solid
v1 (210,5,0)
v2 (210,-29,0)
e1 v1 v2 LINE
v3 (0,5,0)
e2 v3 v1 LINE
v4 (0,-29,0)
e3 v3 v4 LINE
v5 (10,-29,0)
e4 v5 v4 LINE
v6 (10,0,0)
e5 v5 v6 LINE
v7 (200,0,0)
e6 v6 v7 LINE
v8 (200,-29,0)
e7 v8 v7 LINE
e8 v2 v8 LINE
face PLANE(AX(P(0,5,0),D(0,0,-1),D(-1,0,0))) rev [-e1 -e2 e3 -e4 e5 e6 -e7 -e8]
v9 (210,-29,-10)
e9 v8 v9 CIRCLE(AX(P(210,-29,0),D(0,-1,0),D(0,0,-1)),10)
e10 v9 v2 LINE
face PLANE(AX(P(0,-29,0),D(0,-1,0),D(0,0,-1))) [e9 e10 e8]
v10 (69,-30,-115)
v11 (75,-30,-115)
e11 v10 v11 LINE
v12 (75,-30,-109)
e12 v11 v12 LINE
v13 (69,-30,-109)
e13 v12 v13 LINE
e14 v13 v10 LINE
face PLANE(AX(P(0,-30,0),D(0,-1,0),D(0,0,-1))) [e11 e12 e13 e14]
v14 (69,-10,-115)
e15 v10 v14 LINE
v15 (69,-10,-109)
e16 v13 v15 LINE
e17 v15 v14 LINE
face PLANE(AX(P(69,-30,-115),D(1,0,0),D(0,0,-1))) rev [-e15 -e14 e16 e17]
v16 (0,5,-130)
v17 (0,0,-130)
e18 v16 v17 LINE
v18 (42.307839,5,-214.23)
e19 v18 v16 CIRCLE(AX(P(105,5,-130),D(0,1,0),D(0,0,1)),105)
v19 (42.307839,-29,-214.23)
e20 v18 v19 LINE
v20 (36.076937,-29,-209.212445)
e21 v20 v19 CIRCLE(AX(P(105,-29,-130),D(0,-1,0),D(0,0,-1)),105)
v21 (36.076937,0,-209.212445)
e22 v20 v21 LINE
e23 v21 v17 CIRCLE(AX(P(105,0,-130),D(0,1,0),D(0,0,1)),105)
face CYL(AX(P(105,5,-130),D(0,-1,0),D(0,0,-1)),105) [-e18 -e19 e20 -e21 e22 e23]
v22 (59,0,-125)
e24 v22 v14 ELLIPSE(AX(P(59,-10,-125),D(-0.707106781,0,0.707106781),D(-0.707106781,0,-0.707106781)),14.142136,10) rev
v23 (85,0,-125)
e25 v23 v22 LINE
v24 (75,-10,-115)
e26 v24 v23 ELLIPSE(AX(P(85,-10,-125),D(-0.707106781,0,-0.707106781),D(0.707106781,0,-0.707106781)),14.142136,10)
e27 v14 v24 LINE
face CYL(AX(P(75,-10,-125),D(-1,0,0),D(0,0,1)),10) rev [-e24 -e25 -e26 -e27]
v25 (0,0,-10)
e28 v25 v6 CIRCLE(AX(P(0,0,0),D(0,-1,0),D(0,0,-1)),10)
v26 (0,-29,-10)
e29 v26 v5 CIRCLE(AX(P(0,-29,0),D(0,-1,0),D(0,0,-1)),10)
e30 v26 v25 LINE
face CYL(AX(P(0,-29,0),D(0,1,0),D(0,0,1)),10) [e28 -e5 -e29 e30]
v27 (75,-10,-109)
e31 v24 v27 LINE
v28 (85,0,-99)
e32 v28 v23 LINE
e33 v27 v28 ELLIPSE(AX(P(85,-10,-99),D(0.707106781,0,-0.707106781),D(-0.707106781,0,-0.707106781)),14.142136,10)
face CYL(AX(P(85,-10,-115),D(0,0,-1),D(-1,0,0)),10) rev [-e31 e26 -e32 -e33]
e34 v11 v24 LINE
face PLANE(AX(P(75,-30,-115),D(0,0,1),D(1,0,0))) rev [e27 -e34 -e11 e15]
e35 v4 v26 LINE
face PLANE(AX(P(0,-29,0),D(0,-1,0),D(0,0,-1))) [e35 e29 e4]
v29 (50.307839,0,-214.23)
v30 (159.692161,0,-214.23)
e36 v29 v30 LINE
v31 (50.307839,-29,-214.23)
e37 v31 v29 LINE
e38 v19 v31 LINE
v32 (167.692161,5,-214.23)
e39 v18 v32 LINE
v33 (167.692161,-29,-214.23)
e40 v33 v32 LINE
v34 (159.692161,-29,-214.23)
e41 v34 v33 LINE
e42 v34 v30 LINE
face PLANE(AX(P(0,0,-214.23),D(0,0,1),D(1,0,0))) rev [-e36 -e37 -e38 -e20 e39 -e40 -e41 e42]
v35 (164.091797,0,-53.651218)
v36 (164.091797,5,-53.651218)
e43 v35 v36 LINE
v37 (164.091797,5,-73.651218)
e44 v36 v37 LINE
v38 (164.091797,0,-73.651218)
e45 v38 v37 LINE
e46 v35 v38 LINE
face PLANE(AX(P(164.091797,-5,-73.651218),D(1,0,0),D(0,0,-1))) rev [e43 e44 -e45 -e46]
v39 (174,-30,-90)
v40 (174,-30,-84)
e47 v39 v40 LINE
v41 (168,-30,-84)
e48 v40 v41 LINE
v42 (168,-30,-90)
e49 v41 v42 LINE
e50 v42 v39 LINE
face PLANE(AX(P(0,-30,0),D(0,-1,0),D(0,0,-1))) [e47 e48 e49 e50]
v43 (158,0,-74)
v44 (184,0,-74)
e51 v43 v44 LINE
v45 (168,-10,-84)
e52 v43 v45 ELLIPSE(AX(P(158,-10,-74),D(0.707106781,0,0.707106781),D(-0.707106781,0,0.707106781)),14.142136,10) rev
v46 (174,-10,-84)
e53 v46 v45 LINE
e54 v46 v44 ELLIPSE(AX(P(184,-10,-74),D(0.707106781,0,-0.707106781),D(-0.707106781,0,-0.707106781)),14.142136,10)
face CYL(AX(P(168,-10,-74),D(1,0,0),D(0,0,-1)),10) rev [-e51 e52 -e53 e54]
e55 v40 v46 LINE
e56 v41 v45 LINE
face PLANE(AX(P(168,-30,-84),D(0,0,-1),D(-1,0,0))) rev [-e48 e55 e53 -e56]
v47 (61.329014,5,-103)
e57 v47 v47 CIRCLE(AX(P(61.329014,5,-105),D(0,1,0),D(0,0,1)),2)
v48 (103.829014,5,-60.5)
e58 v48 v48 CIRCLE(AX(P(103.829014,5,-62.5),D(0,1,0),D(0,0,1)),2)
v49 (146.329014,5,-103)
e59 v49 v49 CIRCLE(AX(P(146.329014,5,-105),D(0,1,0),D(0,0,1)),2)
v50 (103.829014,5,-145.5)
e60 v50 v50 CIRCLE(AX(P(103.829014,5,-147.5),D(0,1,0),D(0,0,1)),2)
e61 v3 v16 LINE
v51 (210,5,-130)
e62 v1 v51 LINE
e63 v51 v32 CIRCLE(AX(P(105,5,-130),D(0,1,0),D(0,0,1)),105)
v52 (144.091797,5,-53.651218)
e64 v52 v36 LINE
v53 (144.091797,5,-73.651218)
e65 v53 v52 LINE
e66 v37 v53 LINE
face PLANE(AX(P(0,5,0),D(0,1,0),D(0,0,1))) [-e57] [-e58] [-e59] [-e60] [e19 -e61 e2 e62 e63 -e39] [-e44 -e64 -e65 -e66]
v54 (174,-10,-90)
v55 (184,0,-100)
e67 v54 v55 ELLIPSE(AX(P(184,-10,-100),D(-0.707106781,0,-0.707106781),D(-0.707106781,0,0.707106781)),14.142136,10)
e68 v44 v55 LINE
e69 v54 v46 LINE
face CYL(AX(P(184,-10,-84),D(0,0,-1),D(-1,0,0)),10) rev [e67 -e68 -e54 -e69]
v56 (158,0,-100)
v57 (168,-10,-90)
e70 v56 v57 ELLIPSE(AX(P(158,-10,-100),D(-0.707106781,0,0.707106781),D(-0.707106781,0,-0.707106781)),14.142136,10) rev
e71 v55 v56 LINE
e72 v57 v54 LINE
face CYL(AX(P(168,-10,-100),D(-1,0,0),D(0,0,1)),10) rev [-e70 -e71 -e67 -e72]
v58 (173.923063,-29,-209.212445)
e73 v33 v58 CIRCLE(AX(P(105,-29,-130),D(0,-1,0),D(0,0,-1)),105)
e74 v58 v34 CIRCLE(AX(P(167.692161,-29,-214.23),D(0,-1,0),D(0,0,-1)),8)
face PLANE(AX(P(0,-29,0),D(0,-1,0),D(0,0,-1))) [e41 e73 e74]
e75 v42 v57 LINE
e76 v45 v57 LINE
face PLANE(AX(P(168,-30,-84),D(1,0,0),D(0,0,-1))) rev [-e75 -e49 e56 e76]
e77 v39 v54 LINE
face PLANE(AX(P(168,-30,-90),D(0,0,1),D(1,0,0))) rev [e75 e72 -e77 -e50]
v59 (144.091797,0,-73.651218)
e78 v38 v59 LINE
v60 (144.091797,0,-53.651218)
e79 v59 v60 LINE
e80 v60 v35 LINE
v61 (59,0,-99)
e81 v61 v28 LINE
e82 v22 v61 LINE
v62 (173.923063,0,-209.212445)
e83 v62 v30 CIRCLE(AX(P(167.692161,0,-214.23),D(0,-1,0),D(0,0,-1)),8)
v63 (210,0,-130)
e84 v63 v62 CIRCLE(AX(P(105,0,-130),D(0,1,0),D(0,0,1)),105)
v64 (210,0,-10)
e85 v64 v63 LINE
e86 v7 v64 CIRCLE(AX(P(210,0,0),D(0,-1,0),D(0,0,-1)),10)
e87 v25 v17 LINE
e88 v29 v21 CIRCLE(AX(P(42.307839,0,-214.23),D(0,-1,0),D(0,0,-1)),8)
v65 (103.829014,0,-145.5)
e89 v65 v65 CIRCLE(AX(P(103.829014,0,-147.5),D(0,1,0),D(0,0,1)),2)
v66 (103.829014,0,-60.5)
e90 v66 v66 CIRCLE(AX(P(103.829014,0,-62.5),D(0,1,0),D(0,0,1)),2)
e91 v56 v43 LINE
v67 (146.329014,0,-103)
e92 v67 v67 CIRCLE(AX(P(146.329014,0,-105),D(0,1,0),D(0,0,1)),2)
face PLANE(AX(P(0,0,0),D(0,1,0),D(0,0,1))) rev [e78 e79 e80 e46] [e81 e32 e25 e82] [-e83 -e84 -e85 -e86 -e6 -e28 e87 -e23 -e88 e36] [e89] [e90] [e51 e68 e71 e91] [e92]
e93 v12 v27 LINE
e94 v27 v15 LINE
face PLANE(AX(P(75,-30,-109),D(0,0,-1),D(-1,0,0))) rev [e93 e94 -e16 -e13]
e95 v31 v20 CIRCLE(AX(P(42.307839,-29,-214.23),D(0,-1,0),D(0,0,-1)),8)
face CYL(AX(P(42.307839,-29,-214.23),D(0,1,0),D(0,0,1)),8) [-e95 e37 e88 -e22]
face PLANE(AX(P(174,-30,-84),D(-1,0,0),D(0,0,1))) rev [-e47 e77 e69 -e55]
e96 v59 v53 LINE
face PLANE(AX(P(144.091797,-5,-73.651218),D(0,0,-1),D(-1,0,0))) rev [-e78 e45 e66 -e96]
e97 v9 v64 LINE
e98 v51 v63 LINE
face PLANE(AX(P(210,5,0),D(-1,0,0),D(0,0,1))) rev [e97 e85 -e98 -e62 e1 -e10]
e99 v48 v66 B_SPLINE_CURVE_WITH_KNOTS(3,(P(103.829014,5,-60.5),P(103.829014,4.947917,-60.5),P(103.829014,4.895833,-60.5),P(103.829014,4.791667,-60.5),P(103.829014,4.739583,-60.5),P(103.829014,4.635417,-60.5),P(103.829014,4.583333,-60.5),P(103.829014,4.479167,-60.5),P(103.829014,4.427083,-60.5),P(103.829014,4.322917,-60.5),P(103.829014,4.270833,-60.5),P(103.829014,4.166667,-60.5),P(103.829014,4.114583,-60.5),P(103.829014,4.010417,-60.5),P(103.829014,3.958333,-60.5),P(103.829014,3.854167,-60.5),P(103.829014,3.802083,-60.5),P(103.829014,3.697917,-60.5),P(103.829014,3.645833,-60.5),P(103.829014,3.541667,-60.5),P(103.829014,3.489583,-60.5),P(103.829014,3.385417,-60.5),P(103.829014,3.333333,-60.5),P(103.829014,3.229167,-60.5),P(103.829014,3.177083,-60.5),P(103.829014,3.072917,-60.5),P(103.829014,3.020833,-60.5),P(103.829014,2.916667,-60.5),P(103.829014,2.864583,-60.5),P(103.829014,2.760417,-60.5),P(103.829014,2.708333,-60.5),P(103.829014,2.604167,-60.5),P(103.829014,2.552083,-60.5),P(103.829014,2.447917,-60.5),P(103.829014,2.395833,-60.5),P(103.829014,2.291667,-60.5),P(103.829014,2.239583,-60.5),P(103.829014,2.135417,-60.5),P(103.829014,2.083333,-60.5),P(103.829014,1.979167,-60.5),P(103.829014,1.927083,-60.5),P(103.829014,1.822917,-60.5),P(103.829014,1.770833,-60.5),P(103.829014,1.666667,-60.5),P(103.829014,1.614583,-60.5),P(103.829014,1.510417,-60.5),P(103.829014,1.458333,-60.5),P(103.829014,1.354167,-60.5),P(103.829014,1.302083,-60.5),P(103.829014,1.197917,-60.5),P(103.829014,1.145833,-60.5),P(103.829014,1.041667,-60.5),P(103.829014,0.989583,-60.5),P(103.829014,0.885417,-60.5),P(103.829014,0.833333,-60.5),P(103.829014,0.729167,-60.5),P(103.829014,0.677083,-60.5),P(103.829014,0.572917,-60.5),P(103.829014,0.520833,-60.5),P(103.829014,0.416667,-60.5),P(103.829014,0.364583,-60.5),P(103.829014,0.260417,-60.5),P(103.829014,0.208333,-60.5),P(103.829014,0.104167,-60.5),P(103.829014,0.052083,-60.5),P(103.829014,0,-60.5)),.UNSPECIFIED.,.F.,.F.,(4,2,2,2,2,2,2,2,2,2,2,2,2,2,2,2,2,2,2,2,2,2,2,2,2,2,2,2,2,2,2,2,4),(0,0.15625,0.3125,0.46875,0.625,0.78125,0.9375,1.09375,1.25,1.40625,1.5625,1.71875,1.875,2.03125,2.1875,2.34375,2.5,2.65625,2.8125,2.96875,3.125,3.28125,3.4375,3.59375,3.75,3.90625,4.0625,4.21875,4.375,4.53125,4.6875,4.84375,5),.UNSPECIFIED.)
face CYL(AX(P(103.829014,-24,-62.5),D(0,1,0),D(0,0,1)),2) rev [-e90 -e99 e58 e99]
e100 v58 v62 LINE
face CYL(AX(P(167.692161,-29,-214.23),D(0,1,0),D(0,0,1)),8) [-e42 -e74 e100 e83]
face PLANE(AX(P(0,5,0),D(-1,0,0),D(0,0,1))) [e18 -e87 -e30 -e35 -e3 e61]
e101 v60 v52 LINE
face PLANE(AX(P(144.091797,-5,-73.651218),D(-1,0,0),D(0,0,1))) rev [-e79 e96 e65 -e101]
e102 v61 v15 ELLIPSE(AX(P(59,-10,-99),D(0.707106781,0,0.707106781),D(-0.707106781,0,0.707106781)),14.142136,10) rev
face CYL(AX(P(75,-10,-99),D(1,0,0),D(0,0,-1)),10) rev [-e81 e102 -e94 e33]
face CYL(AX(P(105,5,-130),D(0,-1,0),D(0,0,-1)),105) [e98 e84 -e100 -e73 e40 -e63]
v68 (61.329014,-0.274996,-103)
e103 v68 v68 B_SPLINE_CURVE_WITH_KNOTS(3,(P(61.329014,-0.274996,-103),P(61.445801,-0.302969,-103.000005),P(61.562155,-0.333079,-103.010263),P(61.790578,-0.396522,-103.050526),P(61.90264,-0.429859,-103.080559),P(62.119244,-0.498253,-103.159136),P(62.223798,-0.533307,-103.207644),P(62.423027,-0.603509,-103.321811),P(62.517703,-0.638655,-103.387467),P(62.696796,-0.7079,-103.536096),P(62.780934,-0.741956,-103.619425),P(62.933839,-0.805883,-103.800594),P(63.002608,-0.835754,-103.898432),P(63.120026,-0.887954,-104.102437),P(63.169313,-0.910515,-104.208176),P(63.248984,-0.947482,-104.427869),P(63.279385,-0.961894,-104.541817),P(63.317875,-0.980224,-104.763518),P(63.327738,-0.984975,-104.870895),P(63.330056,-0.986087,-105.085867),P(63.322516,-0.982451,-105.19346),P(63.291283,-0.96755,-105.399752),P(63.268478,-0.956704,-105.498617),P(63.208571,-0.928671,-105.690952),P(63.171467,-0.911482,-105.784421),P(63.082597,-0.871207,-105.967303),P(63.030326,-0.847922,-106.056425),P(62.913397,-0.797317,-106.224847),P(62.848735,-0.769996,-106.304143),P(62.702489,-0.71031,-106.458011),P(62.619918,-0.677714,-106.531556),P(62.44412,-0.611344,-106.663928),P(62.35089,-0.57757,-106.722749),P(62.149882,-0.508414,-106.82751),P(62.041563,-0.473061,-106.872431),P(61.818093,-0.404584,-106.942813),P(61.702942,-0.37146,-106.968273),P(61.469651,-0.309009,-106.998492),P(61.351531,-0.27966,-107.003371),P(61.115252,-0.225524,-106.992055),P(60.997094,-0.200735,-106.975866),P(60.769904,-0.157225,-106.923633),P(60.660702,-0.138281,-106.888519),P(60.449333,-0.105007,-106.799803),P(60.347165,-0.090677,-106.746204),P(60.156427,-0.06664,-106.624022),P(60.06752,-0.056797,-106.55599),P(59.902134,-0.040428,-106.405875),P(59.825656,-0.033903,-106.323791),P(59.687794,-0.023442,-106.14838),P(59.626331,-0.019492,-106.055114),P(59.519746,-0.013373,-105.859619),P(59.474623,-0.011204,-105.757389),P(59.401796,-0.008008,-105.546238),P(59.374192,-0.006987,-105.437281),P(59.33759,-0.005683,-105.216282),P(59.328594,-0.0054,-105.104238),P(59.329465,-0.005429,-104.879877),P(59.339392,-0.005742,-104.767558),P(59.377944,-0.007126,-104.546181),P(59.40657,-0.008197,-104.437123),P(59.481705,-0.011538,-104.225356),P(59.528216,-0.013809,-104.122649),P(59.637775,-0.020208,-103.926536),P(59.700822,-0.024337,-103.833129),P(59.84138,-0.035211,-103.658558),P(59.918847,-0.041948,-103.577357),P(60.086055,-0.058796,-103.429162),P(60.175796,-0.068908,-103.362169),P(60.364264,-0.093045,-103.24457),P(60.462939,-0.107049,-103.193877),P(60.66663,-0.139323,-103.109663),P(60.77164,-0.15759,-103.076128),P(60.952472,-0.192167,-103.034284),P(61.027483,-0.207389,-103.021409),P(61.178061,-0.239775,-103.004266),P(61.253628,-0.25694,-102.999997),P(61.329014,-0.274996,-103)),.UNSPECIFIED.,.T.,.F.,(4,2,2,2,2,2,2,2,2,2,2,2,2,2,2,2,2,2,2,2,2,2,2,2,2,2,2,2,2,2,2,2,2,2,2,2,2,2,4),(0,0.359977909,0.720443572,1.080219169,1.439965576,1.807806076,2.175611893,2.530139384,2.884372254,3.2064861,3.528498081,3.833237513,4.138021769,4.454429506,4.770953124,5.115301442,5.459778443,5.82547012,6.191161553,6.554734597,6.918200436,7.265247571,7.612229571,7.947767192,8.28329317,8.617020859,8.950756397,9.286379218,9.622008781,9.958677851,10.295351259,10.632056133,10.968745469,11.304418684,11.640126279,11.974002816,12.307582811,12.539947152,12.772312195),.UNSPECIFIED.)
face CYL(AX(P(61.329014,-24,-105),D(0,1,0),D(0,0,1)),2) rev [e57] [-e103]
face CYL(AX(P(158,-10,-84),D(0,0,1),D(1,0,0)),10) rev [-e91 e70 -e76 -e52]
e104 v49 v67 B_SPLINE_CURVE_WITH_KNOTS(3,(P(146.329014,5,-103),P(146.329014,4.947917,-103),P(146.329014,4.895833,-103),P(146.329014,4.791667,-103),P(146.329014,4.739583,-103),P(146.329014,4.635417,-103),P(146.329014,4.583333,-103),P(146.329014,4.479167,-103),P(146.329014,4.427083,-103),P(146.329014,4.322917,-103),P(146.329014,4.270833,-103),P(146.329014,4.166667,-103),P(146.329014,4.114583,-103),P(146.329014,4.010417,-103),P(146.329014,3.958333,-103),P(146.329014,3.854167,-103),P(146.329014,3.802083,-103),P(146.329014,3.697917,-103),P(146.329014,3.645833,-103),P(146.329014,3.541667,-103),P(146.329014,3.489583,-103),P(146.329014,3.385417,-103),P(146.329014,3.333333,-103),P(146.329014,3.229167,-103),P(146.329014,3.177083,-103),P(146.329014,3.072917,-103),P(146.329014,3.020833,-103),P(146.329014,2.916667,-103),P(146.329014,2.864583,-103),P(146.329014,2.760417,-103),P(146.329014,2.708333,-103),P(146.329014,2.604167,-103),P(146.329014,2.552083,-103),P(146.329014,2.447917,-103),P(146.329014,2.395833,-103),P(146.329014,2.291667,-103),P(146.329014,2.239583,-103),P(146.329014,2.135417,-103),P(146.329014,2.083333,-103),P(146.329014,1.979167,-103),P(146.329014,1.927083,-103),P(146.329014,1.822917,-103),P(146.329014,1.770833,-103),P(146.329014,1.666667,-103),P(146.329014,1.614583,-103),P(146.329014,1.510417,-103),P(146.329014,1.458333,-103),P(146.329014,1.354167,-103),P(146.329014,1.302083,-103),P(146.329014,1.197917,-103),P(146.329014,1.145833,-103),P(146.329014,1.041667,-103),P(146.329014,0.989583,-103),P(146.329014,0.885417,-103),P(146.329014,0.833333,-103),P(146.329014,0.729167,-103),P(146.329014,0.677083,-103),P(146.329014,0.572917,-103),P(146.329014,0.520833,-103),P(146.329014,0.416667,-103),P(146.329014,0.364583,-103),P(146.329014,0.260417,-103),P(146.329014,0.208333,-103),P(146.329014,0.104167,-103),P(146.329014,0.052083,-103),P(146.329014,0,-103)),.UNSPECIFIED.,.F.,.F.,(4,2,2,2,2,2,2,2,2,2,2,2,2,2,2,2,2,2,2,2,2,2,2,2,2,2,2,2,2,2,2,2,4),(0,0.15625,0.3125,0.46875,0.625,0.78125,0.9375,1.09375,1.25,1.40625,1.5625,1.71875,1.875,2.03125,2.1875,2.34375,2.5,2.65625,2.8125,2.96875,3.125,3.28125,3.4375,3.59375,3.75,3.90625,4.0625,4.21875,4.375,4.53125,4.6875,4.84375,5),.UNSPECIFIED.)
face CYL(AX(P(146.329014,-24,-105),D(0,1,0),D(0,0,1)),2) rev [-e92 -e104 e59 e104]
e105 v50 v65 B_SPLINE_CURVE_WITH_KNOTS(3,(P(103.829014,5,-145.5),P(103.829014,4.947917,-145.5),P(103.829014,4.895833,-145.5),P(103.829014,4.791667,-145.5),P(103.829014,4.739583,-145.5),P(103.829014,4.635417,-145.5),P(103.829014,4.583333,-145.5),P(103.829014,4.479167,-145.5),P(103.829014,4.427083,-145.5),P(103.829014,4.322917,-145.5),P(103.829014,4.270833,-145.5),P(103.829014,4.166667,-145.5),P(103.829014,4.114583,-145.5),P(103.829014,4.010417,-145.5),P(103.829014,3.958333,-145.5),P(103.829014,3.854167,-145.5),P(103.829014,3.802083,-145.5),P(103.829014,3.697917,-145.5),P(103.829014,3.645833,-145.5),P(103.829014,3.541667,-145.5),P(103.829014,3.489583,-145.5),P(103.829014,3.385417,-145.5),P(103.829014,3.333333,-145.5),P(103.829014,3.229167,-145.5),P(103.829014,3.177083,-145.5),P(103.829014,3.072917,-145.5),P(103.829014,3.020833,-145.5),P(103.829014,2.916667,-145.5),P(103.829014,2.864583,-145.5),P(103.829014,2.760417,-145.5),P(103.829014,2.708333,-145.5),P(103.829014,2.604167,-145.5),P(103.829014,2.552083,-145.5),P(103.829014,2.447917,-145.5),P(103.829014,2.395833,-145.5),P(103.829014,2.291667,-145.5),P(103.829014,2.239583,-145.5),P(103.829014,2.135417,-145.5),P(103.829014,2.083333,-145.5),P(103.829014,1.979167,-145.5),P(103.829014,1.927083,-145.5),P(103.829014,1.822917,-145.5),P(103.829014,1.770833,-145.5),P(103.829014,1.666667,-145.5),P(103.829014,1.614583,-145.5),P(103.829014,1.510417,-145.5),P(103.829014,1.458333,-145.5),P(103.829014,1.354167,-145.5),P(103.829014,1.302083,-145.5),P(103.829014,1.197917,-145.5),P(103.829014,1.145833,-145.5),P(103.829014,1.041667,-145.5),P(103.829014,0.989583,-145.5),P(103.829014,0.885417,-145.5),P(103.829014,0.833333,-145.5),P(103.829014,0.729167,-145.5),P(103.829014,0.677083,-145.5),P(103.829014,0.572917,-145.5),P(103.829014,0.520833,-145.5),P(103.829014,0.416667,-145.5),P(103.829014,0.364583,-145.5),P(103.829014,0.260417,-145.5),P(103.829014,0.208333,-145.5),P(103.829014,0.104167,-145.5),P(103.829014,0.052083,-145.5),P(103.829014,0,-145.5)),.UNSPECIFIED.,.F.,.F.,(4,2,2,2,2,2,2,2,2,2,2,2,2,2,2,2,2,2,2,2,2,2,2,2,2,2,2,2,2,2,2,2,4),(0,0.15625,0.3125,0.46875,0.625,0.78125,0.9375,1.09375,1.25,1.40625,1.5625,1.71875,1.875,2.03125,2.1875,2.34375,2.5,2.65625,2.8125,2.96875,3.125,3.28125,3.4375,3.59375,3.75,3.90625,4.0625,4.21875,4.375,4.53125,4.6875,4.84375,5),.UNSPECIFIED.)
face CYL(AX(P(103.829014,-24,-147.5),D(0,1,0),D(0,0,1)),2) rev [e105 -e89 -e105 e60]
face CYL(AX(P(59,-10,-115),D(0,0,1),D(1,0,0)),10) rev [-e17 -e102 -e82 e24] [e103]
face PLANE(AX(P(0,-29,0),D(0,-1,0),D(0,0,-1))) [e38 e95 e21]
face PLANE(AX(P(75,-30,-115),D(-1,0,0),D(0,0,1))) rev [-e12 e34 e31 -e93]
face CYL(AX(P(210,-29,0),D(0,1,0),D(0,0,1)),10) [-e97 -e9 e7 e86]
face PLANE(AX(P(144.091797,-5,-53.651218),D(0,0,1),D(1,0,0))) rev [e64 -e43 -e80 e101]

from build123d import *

# Parameters (mm, degrees)
BOSS_EXTRUDE1_DEPTH = 5
SKETCH2_W           = 213.862691863
SKETCH2_H           = 54.913039258
CUT_EXTRUDE1_DEPTH  = 5
BOSS_EXTRUDE2_START = 29
BOSS_EXTRUDE2_DEPTH = 29
SKETCH4_W           = 6
SKETCH4_H           = 6
BOSS_EXTRUDE3_DEPTH = 30
SKETCH5_W           = 6
SKETCH5_H           = 6
BOSS_EXTRUDE4_DEPTH = 30
FILLET1_R           = 10
SKETCH7_R           = 2
CUT_EXTRUDE2_DEPTH  = 29
SKETCH8_W           = 20
SKETCH8_H           = 20
CUT_EXTRUDE3_DEPTH  = 10


with BuildPart() as part:
    # Sketch1 → Boss-Extrude1 (new body)
    with BuildSketch(Plane(origin=(0, 0, 0), x_dir=(1, 0, 0), z_dir=(0, 1, 0))):
        with BuildLine():
            Line((0, 130), (0, 0))
            Line((0, 0), (210, 0))
            Line((210, 0), (210, 130))
            ThreePointArc((210, 130), (105, 235), (0, 130))
        make_face()
    extrude(amount=BOSS_EXTRUDE1_DEPTH)

    # Sketch2 → Cut-Extrude1 (cut)
    with BuildSketch(Plane(origin=(0, 5, 0), x_dir=(1, 0, 0), z_dir=(0, 1, 0))):
        with Locations((106.931345932, 241.686519629)):
            Rectangle(SKETCH2_W, SKETCH2_H)
    extrude(amount=-CUT_EXTRUDE1_DEPTH, mode=Mode.SUBTRACT)

    # Sketch3 → Boss-Extrude2 (add)
    with BuildSketch(Plane(origin=(0, 0, 0), x_dir=(-1, 0, 0), z_dir=(0, -1, 0)).offset(BOSS_EXTRUDE2_START)):
        with BuildLine():
            Line((-42.307838608, 214.23), (-50.307838608, 214.23))
            ThreePointArc((-50.307838608, 214.23), (-44.96798765, 206.685226506), (-36.076936839, 209.212444505))
            ThreePointArc((-36.076936839, 209.212444505), (-39.144584131, 211.78058572), (-42.307838608, 214.23))
        make_face()
        with BuildLine():
            ThreePointArc((-173.923063161, 209.212444505), (-165.03201235, 206.685226506), (-159.692161392, 214.23))
            Line((-159.692161392, 214.23), (-167.692161392, 214.23))
            ThreePointArc((-167.692161392, 214.23), (-170.855415869, 211.78058572), (-173.923063161, 209.212444505))
        make_face()
        with BuildLine():
            Line((0, 0), (0, 10))
            ThreePointArc((0, 10), (-7.071067812, 7.071067812), (-10, 0))
            Line((-10, 0), (0, 0))
        make_face()
        with BuildLine():
            ThreePointArc((-200, 0), (-202.928932188, 7.071067812), (-210, 10))
            Line((-210, 10), (-210, 0))
            Line((-210, 0), (-200, 0))
        make_face()
    extrude(amount=-BOSS_EXTRUDE2_DEPTH)

    # Sketch4 → Boss-Extrude3 (add)
    with BuildSketch(Plane.XZ):
        with Locations((171, -87)):
            Rectangle(SKETCH4_W, SKETCH4_H)
    extrude(amount=BOSS_EXTRUDE3_DEPTH)

    # Sketch5 → Boss-Extrude4 (add)
    with BuildSketch(Plane(origin=(0, 0, 0), x_dir=(-1, 0, 0), z_dir=(0, -1, 0))):
        with Locations((-72, 112)):
            Rectangle(SKETCH5_W, SKETCH5_H)
    extrude(amount=BOSS_EXTRUDE4_DEPTH)

    # Fillet1
    fillet1_edges = [part.edges().sort_by_distance(p)[0] for p in [
        (171, 0, -84),
        (168, 0, -87),
        (174, 0, -87),
        (171, 0, -90),
        (72, 0, -109),
        (69, 0, -112),
        (72, 0, -115),
        (75, 0, -112),
    ]]
    fillet(fillet1_edges, radius=FILLET1_R)

    # Sketch7 → Cut-Extrude2 (cut)
    with BuildSketch(Plane(origin=(0, 5, 0), x_dir=(1, 0, 0), z_dir=(0, 1, 0))):
        with Locations((103.829013771, 147.5)):
            Circle(SKETCH7_R)
        with Locations((146.329013771, 105)):
            Circle(SKETCH7_R)
        with Locations((103.829013771, 62.5)):
            Circle(SKETCH7_R)
        with Locations((61.329013771, 105)):
            Circle(SKETCH7_R)
    extrude(amount=-CUT_EXTRUDE2_DEPTH, mode=Mode.SUBTRACT)

    # Sketch8 → Cut-Extrude3 (cut)
    with BuildSketch(Plane(origin=(0, 5, 0), x_dir=(1, 0, 0), z_dir=(0, 1, 0))):
        with Locations((154.091797389, 63.651218277)):
            Rectangle(SKETCH8_W, SKETCH8_H)
    extrude(amount=-CUT_EXTRUDE3_DEPTH, mode=Mode.SUBTRACT)


solid = part.part
